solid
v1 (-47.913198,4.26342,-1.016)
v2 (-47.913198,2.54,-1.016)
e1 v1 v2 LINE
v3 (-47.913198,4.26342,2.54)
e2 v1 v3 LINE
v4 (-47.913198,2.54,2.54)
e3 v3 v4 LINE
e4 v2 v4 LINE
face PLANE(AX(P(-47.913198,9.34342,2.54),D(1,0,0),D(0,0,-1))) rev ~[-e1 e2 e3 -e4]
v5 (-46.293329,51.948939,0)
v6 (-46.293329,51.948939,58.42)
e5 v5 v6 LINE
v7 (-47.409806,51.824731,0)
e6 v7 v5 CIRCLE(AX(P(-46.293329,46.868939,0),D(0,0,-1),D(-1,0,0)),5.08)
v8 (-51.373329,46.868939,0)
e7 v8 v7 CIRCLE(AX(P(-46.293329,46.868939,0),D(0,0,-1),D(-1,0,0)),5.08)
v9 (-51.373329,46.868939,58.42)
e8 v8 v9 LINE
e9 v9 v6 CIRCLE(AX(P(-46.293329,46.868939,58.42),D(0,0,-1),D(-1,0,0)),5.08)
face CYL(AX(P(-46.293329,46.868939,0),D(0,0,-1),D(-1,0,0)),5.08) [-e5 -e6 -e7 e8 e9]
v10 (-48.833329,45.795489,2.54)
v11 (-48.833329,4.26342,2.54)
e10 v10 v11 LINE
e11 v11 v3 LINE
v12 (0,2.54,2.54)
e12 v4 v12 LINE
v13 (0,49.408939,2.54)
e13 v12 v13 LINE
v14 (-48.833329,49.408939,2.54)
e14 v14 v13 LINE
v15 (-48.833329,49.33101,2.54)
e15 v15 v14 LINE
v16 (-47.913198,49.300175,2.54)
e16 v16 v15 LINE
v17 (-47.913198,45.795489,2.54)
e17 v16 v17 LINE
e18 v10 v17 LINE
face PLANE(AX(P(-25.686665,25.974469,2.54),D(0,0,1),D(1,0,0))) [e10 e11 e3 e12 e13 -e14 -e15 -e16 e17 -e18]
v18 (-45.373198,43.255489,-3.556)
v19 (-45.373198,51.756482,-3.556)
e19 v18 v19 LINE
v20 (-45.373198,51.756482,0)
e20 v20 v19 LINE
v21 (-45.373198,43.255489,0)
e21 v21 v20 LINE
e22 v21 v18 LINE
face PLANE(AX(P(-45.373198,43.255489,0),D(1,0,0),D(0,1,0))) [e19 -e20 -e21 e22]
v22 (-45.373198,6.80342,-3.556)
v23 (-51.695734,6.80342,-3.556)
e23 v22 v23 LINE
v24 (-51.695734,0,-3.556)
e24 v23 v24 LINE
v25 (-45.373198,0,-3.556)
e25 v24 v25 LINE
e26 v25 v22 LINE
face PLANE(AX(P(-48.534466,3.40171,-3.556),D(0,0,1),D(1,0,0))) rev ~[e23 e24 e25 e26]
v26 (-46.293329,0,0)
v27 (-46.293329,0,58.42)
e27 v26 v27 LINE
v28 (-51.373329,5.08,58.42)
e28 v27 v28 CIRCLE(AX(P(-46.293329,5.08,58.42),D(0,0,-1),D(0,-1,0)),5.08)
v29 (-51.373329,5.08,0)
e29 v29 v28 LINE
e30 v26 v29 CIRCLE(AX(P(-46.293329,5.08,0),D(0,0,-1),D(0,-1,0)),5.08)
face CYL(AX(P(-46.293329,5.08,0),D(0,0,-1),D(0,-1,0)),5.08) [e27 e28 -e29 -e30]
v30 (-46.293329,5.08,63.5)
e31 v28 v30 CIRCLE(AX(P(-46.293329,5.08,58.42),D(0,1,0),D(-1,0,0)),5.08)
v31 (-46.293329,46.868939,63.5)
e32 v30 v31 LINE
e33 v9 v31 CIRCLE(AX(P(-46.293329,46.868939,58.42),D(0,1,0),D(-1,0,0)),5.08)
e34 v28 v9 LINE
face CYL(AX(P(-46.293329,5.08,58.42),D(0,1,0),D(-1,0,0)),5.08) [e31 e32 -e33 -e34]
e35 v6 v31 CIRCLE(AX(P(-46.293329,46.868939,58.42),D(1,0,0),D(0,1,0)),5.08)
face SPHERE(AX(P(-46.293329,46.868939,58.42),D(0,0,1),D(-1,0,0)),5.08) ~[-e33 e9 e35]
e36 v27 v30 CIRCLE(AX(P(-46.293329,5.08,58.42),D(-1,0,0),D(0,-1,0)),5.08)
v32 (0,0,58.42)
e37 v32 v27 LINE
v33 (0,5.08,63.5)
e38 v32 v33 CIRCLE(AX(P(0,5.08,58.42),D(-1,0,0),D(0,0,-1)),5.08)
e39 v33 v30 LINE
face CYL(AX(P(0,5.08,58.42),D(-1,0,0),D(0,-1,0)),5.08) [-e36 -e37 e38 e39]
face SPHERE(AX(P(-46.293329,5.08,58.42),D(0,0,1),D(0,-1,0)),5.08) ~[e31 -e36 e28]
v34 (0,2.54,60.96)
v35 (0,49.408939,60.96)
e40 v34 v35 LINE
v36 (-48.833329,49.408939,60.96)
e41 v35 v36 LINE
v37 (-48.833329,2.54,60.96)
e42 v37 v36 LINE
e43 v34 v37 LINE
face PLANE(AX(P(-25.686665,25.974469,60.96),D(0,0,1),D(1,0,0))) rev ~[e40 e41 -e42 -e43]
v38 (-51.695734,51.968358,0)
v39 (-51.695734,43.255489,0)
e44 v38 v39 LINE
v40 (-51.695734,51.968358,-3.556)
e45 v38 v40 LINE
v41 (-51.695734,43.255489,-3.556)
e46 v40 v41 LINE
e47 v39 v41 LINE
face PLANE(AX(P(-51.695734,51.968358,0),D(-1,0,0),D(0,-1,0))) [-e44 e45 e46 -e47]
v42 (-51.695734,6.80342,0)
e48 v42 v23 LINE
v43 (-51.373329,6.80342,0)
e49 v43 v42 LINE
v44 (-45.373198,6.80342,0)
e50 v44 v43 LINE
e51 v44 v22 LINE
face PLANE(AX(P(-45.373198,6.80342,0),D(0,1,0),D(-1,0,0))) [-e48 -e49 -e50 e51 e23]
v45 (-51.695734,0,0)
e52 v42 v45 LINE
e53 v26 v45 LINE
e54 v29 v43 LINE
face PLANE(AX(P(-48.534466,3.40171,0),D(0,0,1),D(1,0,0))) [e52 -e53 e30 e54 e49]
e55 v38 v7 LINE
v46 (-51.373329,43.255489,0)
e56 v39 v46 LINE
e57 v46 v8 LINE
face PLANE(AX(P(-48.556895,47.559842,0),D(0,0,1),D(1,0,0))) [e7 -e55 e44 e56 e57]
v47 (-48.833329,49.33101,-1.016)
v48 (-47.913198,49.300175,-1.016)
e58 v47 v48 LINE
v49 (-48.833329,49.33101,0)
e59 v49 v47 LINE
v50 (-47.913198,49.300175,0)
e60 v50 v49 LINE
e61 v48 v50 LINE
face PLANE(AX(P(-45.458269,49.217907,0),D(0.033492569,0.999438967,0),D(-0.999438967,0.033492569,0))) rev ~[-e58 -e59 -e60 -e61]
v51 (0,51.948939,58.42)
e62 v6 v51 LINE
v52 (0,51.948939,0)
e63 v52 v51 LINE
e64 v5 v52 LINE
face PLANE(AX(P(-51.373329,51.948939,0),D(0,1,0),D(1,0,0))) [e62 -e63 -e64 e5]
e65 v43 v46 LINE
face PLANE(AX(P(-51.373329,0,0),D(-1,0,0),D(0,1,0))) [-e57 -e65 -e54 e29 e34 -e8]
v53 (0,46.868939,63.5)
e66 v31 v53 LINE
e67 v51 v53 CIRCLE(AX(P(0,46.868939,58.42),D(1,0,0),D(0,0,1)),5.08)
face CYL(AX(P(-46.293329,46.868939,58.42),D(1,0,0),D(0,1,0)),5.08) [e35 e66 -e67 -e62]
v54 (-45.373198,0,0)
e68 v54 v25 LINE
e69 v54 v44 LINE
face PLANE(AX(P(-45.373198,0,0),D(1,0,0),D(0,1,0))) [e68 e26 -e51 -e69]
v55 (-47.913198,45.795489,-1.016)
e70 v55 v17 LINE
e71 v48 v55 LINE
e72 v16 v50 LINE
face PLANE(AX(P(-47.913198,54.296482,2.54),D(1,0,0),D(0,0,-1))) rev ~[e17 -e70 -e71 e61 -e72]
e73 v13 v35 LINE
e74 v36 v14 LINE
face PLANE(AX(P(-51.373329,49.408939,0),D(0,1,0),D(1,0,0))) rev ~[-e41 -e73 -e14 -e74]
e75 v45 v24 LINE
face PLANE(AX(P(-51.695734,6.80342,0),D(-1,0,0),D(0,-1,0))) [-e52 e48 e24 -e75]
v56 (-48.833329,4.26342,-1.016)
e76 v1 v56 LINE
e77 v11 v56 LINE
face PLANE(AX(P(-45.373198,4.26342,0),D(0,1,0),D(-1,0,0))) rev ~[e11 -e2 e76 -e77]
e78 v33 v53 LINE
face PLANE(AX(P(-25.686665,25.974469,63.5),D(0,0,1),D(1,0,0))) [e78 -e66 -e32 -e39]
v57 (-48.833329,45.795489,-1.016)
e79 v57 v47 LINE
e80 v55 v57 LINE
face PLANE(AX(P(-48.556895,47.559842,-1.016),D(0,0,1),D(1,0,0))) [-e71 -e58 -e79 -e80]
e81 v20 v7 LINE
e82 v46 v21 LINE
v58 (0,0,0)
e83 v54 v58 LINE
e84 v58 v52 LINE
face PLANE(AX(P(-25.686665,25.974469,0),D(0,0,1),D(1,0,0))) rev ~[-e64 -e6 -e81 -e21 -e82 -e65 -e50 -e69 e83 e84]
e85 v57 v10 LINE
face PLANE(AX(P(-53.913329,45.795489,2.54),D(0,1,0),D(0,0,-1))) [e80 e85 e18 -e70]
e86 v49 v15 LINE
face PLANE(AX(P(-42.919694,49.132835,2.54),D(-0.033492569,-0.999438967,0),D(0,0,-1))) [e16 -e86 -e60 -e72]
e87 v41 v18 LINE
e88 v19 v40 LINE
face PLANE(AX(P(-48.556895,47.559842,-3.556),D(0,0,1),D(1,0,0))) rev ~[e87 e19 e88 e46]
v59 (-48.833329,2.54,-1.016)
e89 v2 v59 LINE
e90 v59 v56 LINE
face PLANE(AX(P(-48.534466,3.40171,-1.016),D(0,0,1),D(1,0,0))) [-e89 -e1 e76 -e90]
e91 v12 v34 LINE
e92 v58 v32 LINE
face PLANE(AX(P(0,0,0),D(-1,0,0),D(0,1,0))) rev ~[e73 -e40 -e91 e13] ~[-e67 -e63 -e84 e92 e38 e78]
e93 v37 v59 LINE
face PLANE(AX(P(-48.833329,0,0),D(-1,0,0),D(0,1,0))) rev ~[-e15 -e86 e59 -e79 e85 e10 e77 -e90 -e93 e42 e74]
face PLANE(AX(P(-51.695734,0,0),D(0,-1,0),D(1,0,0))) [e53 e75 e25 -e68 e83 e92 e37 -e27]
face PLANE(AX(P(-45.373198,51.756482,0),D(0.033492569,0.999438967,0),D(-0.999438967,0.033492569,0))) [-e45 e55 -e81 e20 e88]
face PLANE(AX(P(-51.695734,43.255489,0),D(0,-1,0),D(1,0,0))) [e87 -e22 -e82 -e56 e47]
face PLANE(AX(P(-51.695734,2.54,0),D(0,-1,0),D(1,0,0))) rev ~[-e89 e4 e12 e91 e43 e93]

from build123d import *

# Parameters (mm, degrees)
F0_W         = 51.3733290136
F0_H         = 51.9489385188
F1_DEPTH     = 63.5
F3_DEPTH     = 3.556
F4_T         = 2.54
F4_T3_DEPTH  = 13.7734491992
F4_T5_DEPTH  = 11.8834199066
F4_T7_DEPTH  = 11.0801313686
F4_T9_DEPTH  = 13.5809922736
F4_T11_DEPTH = 10.8262574938
F4_T13_DEPTH = 5.3370977176
F5_T1_DEPTH  = 76.2
F6_R         = 5.08


# Not quite as in the source:
# - a fillet or chamfer that OpenCascade refuses, or shapes differently, is made with other operations: its cross-section is extruded or revolved along the edge and cut away or added
# - a shell that OpenCascade refuses in one call is made with other operations: the cavity is built on its own and cut out


with BuildPart() as f1:
    # F0 (on Top) → F1 (new body)
    with BuildSketch(Plane.XY):
        with Locations((-25.6866645068, 25.9744692594)):
            Rectangle(F0_W, F0_H)
    extrude(amount=F1_DEPTH)

    # F2 (on Top) → F3 (join)
    with BuildSketch(Plane.XY):
        Polygon((-51.6957342625, 3.4017099533), (-51.6957342625, 0), (-45.3731976449, 0), (-45.3731976449, 6.8034199066), (-51.6957342625, 6.8034199066), align=None)
        Polygon((-45.3731976449, 43.2554893196), (-45.3731976449, 51.7564815932), (-51.6957342625, 51.9683584571), (-51.6957342625, 47.6119238883), (-51.6957342625, 43.2554893196), align=None)
    extrude(amount=-F3_DEPTH)

    # F4: shell of thickness 2.54, made by hand


with BuildPart() as f4_core1:
    # F4_t2: copy of F1
    add(f1.part)

    # the walls: a layer under each face that stays
    f4_faces = [f4_core1.faces().sort_by_distance(p)[0] for p in [
        (-25.8478671312, 0, 29.972),
        (-51.3733290136, 25.9744692594, 31.75),
        (-25.6866645068, 25.9744692594, 0),
        (-25.6866645068, 25.9744692594, 63.5),
        (-25.6866645068, 51.9489385188, 31.75),
        (-51.4059827792, 47.6119238883, 0),
        (-51.534531638, 3.4017099533, 0),
        (-51.6957342625, 3.4017099533, -1.778),
        (-45.3731976449, 3.4017099533, -1.778),
        (-48.5344659537, 3.4017099533, -3.556),
        (-48.5344659537, 6.8034199066, -1.778),
        (-48.5344659537, 43.2554893196, -1.778),
        (-45.3731976449, 47.5059854564, -1.778),
        (-48.5344659537, 51.8624200251, -1.778),
        (-51.6957342625, 47.6119238883, -1.778),
        (-48.5344659537, 47.6119238883, -3.556),
    ]]
    thicken(f4_faces, amount=-F4_T, mode=Mode.SUBTRACT)

    # F4_s4 → F4_t3 (cut)
    with BuildSketch(Plane.XZ.offset(-54.4889385188)):
        Polygon((-51.3987290136, 0.0254), (-48.8333290136, 0), (-48.8333290136, -2.54), (-51.3733290136, -2.54), align=None)
    extrude(amount=F4_T3_DEPTH, mode=Mode.SUBTRACT)

    # F4_s6 → F4_t5 (cut)
    with BuildSketch(Plane.XZ.offset(-9.3434199066)):
        Polygon((-51.3987290136, 0.0254), (-48.8333290136, 0), (-48.8333290136, -2.54), (-51.3733290136, -2.54), align=None)
        Polygon((-45.3477976449, -0.0254), (-45.3731976449, 2.54), (-47.9131976449, 2.54), (-47.9131976449, 0), align=None)
    extrude(amount=F4_T5_DEPTH, mode=Mode.SUBTRACT)

    # F4_s8 → F4_t7 (cut)
    with BuildSketch(Plane.YZ.offset(-53.9133290136)):
        Polygon((6.8288199066, -0.0254), (6.8034199066, 2.54), (4.2634199066, 2.54), (4.2634199066, 0), align=None)
        Polygon((43.2300893196, -0.0254), (43.2554893196, 2.54), (45.7954893196, 2.54), (45.7954893196, 0), align=None)
    extrude(amount=F4_T7_DEPTH, mode=Mode.SUBTRACT)

    # F4_s10 → F4_t9 (cut)
    with BuildSketch(Plane.XZ.offset(-54.2964815932)):
        Polygon((-45.3477976449, -0.0254), (-45.3731976449, 2.54), (-47.9131976449, 2.54), (-47.9131976449, 0), align=None)
    extrude(amount=F4_T9_DEPTH, mode=Mode.SUBTRACT)

    # F4_s12 → F4_t11 (cut)
    with BuildSketch(Plane(origin=(-44.5162101899, 1.4917991907, 0), x_dir=(0, 0, 1), z_dir=(-0.9994389665, 0.033492569, 0))):
        Polygon((-0.0254, 50.2331795219), (2.54, 50.2077795219), (2.54, 47.6677795219), (0, 47.6677795219), align=None)
    extrude(amount=F4_T11_DEPTH, mode=Mode.SUBTRACT)

    # F4_s14 → F4_t13 (cut)
    with BuildSketch(Plane.YZ.offset(-53.9133290136)):
        Polygon((51.9743385188, 0.0254), (49.4089385188, 0), (49.4089385188, -2.54), (51.9489385188, -2.54), align=None)
    extrude(amount=F4_T13_DEPTH, mode=Mode.SUBTRACT)


with BuildPart() as f1_1:
    add(f1.part)

    # what is left inside the walls is the cavity
    f4_cavity = [f4_core1.part.solids().sort_by_distance(p)[0] for p in [
        (-24.416665, 2.5654, 40.301333),
    ]]
    add(f4_cavity, mode=Mode.SUBTRACT)

    # F5: fillet of radius 5.08 on 2 edges, made by hand

    # F5_s2 → F5_t1 (cut)
    with BuildSketch(Plane.XY):
        with BuildLine():
            ThreePointArc((-46.2933290136, 0), (-49.885431462, 1.4878975516), (-51.3733290136, 5.08))
            Line((-51.3733290136, 5.08), (-51.3733290136, 0))
            Line((-51.3733290136, 0), (-46.2933290136, 0))
        make_face()
        with BuildLine():
            ThreePointArc((-51.3733290136, 46.8689385188), (-49.885431462, 50.4610409672), (-46.2933290136, 51.9489385188))
            Line((-46.2933290136, 51.9489385188), (-51.3733290136, 51.9489385188))
            Line((-51.3733290136, 51.9489385188), (-51.3733290136, 46.8689385188))
        make_face()
    extrude(amount=F5_T1_DEPTH, mode=Mode.SUBTRACT)

    # F6
    f6_edges = [f1_1.edges().sort_by_distance(p)[0] for p in [
        (-51.373329, 25.974469, 63.5),
        (-23.146665, 0, 63.5),
        (-23.146665, 51.948939, 63.5),
        (-49.885431, 50.461041, 63.5),
        (-49.885431, 1.487898, 63.5),
    ]]
    fillet(f6_edges, radius=F6_R)


solid = f1_1.part
